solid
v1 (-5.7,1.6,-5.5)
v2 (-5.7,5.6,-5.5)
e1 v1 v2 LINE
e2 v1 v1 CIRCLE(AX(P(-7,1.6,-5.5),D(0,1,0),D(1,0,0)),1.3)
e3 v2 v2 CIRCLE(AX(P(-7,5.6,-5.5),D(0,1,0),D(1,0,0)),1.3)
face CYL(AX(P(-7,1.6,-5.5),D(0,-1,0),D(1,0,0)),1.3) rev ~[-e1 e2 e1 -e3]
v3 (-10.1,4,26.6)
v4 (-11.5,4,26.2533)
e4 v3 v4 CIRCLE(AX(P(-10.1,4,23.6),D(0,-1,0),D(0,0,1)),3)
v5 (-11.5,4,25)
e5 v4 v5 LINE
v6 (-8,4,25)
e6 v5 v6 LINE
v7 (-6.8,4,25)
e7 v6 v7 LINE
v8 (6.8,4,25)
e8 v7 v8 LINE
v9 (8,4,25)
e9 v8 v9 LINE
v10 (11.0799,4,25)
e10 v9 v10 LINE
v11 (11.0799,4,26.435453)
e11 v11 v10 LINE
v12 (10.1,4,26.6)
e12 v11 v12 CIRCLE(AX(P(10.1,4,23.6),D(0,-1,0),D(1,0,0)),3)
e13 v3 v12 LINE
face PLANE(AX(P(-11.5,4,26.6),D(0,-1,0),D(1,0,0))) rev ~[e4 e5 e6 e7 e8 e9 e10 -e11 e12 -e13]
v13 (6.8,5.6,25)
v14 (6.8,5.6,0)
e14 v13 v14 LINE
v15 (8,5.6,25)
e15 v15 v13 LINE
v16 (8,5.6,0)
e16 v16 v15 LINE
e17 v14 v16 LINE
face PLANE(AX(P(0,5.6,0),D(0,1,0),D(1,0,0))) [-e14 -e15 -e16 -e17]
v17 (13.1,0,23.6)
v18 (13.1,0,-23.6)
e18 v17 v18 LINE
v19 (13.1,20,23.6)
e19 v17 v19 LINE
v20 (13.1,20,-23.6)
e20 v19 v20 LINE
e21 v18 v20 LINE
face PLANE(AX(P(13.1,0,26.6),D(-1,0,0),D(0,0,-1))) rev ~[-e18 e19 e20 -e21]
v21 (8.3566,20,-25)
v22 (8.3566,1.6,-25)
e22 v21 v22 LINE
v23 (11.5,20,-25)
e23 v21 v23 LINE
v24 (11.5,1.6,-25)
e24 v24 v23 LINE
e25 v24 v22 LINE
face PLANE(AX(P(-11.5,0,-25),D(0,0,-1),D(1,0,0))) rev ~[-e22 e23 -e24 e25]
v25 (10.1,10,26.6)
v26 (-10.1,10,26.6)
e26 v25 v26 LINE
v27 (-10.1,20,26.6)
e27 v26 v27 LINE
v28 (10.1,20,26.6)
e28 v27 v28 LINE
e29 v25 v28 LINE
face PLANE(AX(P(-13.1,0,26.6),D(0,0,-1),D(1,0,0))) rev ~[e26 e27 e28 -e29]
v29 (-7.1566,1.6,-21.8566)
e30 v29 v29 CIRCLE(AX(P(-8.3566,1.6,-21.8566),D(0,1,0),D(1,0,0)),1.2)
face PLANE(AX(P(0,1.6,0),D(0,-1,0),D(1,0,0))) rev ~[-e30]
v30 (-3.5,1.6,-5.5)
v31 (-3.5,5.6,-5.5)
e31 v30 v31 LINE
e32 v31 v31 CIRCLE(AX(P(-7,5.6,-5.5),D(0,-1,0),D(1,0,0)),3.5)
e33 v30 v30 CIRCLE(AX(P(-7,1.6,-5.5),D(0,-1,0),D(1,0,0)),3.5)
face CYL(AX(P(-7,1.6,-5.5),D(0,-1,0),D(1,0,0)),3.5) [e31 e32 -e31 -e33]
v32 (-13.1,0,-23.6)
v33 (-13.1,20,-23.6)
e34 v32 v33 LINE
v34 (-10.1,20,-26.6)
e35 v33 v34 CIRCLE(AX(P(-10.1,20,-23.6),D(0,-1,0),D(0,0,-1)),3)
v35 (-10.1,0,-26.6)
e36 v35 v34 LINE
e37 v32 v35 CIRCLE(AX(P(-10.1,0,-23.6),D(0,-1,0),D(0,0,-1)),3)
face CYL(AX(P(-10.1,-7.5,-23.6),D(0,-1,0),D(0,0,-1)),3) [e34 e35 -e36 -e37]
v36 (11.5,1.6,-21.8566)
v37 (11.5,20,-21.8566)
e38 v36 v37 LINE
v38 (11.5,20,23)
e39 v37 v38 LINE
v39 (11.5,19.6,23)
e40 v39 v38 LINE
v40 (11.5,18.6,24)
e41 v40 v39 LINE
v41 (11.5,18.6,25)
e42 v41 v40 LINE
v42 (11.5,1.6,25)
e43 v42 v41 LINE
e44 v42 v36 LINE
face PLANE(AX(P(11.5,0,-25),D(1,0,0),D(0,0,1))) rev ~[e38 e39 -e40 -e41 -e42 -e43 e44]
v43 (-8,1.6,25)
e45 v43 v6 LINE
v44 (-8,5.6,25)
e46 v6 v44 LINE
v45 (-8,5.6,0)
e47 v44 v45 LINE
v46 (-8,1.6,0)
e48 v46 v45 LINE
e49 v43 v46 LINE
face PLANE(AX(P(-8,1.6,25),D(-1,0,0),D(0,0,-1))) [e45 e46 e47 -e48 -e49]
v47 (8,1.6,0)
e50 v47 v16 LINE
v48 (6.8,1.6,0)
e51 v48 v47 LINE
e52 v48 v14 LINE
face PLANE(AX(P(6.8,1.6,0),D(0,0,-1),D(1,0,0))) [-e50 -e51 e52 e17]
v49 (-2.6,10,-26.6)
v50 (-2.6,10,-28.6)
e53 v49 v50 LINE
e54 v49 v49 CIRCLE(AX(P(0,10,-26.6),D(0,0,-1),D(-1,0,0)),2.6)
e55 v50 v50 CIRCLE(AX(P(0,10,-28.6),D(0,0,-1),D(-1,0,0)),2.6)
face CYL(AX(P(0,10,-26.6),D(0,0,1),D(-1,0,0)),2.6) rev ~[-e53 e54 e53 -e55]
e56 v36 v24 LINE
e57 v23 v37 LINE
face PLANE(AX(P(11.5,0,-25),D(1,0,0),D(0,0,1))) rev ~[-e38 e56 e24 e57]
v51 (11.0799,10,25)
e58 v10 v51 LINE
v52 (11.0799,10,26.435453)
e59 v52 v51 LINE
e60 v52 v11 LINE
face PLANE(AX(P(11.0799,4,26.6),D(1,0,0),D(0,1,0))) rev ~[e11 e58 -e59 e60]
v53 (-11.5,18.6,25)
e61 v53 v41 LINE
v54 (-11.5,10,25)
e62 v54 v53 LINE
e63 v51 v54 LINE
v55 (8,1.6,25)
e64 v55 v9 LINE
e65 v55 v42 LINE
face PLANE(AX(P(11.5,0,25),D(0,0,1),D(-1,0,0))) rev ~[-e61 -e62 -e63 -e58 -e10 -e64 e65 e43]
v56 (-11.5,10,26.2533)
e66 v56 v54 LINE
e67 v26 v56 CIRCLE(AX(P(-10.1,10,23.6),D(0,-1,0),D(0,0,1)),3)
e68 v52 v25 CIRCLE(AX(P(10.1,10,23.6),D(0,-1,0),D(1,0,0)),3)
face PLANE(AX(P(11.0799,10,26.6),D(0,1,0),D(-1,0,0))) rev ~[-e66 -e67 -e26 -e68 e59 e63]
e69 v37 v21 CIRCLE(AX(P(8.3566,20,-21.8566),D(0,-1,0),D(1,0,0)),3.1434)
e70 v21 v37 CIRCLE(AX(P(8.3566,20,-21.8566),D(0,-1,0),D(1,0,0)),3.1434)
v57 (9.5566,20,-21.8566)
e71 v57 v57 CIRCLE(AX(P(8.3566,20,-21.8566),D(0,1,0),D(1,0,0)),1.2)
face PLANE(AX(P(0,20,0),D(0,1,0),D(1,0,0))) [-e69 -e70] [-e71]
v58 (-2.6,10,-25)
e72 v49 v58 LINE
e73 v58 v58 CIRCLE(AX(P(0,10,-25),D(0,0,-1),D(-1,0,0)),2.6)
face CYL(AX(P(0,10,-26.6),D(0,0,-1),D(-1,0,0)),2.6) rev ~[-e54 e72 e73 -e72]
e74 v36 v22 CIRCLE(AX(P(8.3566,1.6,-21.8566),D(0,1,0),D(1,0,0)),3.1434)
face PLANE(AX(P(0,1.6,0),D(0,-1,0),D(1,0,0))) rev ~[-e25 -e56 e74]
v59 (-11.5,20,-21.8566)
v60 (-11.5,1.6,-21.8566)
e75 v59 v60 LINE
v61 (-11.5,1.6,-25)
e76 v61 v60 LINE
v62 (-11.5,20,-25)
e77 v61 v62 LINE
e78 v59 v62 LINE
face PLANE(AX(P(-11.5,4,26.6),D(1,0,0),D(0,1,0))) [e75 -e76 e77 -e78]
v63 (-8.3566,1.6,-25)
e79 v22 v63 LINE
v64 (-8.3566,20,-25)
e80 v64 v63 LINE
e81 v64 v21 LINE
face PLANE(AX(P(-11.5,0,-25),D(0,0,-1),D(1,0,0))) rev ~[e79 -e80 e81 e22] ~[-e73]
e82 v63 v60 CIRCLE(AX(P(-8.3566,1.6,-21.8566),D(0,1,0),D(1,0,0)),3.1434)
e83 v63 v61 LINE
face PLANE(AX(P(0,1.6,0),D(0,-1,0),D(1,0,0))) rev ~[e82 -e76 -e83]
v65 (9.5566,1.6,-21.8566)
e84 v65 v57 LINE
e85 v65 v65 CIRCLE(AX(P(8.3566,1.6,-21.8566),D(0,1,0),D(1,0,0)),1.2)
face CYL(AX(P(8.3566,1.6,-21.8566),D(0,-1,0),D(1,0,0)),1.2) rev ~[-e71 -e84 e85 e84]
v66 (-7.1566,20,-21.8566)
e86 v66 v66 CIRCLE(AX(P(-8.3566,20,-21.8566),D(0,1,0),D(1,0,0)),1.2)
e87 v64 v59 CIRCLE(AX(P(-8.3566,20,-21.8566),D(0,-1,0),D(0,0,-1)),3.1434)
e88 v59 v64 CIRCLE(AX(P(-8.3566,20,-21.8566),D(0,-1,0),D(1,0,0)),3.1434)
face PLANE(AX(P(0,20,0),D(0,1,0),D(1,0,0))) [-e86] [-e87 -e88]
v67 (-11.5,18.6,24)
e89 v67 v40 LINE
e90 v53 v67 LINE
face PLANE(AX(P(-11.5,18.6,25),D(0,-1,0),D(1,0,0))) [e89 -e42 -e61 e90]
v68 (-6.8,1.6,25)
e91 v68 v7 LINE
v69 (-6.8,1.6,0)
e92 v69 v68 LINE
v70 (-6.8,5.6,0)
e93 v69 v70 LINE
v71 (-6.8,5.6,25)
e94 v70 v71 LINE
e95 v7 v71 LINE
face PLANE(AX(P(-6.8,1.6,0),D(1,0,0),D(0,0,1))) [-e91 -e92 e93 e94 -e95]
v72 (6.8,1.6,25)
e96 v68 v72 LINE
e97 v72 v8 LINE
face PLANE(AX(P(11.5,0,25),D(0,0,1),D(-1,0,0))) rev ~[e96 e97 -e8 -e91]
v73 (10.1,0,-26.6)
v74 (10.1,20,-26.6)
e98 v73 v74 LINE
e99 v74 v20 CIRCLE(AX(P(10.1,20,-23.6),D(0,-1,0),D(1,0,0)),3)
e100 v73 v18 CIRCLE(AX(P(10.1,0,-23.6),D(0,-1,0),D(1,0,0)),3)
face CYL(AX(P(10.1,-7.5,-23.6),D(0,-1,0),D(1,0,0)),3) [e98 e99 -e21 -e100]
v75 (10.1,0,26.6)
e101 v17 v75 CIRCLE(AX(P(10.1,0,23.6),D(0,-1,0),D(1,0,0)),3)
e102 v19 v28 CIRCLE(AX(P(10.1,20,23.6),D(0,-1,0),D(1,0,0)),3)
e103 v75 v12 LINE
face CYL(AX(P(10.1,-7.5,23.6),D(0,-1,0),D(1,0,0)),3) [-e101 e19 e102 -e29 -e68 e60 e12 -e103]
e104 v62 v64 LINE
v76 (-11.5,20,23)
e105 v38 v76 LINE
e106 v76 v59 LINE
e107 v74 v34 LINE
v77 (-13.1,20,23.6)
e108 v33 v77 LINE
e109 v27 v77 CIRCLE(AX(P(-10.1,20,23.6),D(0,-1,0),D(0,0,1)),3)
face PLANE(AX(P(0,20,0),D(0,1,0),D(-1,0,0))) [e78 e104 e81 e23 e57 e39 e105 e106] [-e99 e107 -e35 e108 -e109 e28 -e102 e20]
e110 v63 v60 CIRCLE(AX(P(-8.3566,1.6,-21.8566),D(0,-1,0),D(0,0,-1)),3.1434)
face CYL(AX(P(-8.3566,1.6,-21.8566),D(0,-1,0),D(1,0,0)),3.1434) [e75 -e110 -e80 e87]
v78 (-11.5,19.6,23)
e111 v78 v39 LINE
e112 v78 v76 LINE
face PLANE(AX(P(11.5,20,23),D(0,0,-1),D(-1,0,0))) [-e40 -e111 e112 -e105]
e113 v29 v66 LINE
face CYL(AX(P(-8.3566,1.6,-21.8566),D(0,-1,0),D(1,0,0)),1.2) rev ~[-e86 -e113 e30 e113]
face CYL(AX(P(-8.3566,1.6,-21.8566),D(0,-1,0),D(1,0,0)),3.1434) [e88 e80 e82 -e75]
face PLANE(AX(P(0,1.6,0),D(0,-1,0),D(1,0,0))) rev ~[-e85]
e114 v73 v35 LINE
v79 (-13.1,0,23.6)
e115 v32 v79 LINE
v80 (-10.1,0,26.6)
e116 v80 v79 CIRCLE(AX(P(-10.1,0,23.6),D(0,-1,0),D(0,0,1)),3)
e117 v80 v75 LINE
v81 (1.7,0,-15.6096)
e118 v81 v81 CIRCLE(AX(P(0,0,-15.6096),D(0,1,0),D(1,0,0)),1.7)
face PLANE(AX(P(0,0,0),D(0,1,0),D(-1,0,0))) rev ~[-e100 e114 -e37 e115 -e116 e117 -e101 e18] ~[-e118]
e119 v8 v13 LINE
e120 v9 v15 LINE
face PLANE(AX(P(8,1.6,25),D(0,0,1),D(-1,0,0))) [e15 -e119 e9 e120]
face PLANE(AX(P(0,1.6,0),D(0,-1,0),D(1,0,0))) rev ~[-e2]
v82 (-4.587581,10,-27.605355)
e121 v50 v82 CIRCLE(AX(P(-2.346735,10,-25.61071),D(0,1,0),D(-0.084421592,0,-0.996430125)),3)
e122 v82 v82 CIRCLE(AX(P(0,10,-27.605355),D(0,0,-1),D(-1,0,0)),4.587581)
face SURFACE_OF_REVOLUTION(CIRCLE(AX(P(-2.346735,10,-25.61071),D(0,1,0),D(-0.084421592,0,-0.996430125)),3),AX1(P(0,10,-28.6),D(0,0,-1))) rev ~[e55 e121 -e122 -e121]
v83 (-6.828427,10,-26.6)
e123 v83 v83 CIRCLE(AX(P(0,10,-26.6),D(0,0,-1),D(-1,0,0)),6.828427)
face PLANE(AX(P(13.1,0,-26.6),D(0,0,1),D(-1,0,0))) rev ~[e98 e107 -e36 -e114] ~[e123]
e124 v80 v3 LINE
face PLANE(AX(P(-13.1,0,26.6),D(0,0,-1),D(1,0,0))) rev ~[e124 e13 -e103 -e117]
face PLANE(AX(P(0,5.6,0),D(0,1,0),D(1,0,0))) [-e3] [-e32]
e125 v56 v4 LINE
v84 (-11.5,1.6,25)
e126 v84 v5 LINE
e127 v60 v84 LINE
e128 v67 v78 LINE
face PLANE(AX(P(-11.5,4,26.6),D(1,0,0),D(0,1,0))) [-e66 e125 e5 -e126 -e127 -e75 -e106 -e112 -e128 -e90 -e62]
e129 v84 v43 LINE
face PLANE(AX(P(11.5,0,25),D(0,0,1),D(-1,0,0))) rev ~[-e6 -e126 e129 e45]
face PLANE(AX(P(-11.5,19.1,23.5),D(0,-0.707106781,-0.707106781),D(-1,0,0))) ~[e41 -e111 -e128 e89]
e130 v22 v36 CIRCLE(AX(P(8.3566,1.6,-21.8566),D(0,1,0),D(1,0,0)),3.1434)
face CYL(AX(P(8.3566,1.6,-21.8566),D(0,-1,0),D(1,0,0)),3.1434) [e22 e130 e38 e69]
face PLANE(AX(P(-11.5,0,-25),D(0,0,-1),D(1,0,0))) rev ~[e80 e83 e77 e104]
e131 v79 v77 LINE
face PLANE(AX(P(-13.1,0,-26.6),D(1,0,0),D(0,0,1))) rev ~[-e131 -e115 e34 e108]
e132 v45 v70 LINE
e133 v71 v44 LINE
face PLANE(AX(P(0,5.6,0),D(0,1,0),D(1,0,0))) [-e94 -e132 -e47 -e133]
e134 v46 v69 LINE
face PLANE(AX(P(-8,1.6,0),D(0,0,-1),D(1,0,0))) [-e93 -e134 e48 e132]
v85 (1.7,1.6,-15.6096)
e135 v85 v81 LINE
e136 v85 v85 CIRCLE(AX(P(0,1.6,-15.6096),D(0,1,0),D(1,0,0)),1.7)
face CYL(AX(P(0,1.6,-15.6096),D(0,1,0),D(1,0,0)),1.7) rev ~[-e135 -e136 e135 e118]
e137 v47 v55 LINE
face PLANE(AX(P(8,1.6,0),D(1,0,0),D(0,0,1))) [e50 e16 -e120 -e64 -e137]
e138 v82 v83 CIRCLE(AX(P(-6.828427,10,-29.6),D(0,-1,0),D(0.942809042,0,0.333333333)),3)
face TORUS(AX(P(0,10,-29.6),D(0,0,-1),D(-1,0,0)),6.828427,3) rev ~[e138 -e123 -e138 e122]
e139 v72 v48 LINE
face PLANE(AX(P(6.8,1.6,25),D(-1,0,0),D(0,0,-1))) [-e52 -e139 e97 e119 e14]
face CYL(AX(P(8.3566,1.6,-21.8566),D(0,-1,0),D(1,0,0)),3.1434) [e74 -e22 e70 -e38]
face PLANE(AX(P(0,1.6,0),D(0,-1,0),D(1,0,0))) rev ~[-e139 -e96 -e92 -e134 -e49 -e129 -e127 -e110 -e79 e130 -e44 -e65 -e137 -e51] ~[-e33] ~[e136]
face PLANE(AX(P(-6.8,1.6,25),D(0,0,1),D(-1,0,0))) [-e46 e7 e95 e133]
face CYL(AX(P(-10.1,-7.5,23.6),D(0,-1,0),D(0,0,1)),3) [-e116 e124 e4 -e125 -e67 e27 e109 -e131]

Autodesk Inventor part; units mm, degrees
ref_plane "YZ Plane" through (0, 0, 0) normal (1, 0, 0) x (0, 1, 0)
ref_plane "XZ Plane" through (0, 0, 0) normal (0, 1, 0) x (-1, 0, 0)
ref_plane "XY Plane" through (0, 0, 0) normal (0, 0, 1) x (1, 0, 0)
sketch "Sketch1" plane through (0, 0, 0) normal (0, 1, 0) x (-1, 0, 0)
  line L0 (-11.5, 25) -> (11.5, 25)
  line L1 (11.5, 25) -> (11.5, -25)
  line L2 (11.5, -25) -> (-11.5, -25)
  line L3 (-11.5, -25) -> (-11.5, 25)
  line L4 (-11.5, 25) -> (11.5, -25) construction
  line L5 (11.5, 25) -> (-11.5, -25) construction
  line L6 (-13.1, -26.6) -> (13.1, -26.6)
  line L7 (13.1, -26.6) -> (13.1, 26.6)
  line L8 (13.1, 26.6) -> (-13.1, 26.6)
  line L9 (-13.1, 26.6) -> (-13.1, -26.6)
  line L10 (-13.1, -26.6) -> (13.1, 26.6) construction
  line L11 (13.1, -26.6) -> (-13.1, 26.6) construction
  point P0 (0, 0)
  dimension "d0" = 23
  dimension "d1" = 50
  dimension "d2" = 1.6
  dimension "d3" = 1.6
extrude "Extrusion1" add sketch "Sketch1" along normal blind 20
sketch "Sketch2" plane through (0, 0, 0) normal (0, -1, 0) x (1, 0, 0)
  line L0 (-11.5, -25) -> (-11.5, 25) projected
  line L1 (-11.5, 25) -> (11.5, 25) projected
  line L2 (11.5, 25) -> (11.5, -25) projected
  line L3 (11.5, -25) -> (-11.5, -25) projected
  point P0 (0, 0)
extrude "Extrusion2" add sketch "Sketch2" against normal blind 1.6
sketch "Sketch3" plane through (0, 1.6, 0) normal (0, 1, 0) x (1, 0, 0)
  line L0 (-11.5, 25) -> (11.5, 25) projected
  line L1 (-10.5, 9) -> (10.5, 9)
  line L2 (10.5, 9) -> (10.5, -23)
  line L3 (10.5, -23) -> (-10.5, -23)
  line L4 (-10.5, -23) -> (-10.5, 9)
  line L5 (-10.5, 9) -> (10.5, -23) construction
  line L6 (10.5, 9) -> (-10.5, -23) construction
  circle A0 centre (-7, 5.5) radius 1.3
  circle A1 centre (-7, 5.5) radius 3.5
  point P0 (0, 0)
  point P1 (0, -7)
  dimension "d8" = 21
  dimension "d9" = 32
  dimension "d10" = 16
  dimension "d11" = 2.6
  dimension "d26" = 3.5
  dimension "d27" = 3.5
  dimension "d29" = 7
extrude "Extrusion3" add sketch "Sketch3" along normal blind 4 contours A1
sketch "Sketch4" plane through (-13.1, 0, 26.6) normal (0, 0, 1) x (1, 0, 0)
  line L0 (0, 0) -> (26.2, 0) projected
  line L1 (1.6, 1.6) -> (1.6, 20) projected
  line L2 (1.6, 1.6) -> (1.6, 20) projected
  line L3 (24.6, 1.6) -> (24.6, 20) projected
  line L4 (24.6, 1.6) -> (24.6, 20) projected
  line L5 (1.6, 4) -> (24.1799, 4)
  line L6 (24.1799, 4) -> (24.1799, 10)
  line L7 (24.1799, 10) -> (1.6, 10)
  line L8 (1.6, 10) -> (1.6, 4)
  point P0 (13.1, 0)
  dimension "d16" = 6
  dimension "d17" = 4
extrude "Extrusion4" cut sketch "Sketch4" against normal blind 4
sketch "Sketch5" plane through (0, 1.6, 0) normal (0, 1, 0) x (1, 0, 0)
  line L0 (-11.5, -25) -> (-11.5, 25) projected
  line L1 (11.5, -25) -> (-11.5, -25) projected
  line L2 (11.5, 25) -> (11.5, -25) projected
  line L3 (6.8, 0) -> (8, 0)
  line L4 (8, 0) -> (8, -25)
  line L5 (8, -25) -> (6.8, -25)
  line L6 (6.8, -25) -> (6.8, 0)
  line L7 (-8, 0) -> (-6.8, 0)
  line L8 (-6.8, 0) -> (-6.8, -25)
  line L9 (-6.8, -25) -> (-8, -25)
  line L10 (-8, -25) -> (-8, 0)
  point P0 (0, 0)
  dimension "d20" = 1.2
  dimension "d21" = 1.2
  dimension "d22" = 3.5
  dimension "d23" = 3.5
extrude "Extrusion5" add sketch "Sketch5" along normal blind 4
fillet "Fillet1" radius 3 4 edges at (13.1, 10, 26.6) (13.1, 10, -26.6) (-13.1, 10, -26.6) (-13.1, 10, 26.6)
sketch "Sketch6" plane through (10.1, 0, -26.6) normal (0, 0, -1) x (-1, 0, 0)
  circle A0 centre (10.1, 10) radius 2.6
  point P0 (10.1, 0)
  dimension "d31" = 5.2
extrude "Extrusion6" cut sketch "Sketch6" against normal blind 4
sketch "Sketch7" plane through (10.1, 0, -26.6) normal (0, 0, -1) x (-1, 0, 0)
  circle A0 centre (10.1, 10) radius 2.6 projected
  circle A1 centre (10.1, 10) radius 4
  point P0 (10.1, 0)
  dimension "d34" = 8
extrude "Extrusion7" add sketch "Sketch7" along normal blind 2
fillet "Fillet2" radius 3 2 edges at (4, 10, -26.6) (4, 10, -28.6)
sketch "Sketch8" plane through (-11.5, 20, 25) normal (1, 0, 0) x (0, 0, -1)
  line L0 (-1.2533, -16) -> (-1.2533, -10) projected
  line L1 (-1.2533, -16) -> (0, -16) projected
  line L2 (0, -18.4) -> (0, -16) projected
  line L3 (0, -18.4) -> (50, -18.4) projected
  line L4 (50, -18.4) -> (50, 0) projected
  line L5 (0, 0) -> (50, 0) projected
  line L6 (0, -10) -> (0, 0) projected
  line L7 (-1.2533, -10) -> (0, -10) projected
  line L8 (27, -18.4) -> (34, -18.4) projected
  line L9 (29.2, -14.4) -> (31.8, -14.4) projected
  line L10 (34, -14.4) -> (27, -14.4) projected
  point P0 (25, -20)
  dimension "d38" = 14.4
sketch "Sketch9" plane through (11.5, 20, 25) normal (0, 0, -1) x (-1, 0, 0)
  line L0 (23, -10) -> (23, 0) projected
  line L1 (0, 0) -> (23, 0)
  line L2 (23, 0) -> (23, -1.4)
  line L3 (23, -1.4) -> (0, -1.4)
  line L4 (0, -1.4) -> (0, 0)
  point P0 (11.5, -20)
  dimension "d39" = 1.4
extrude "Extrusion8" add sketch "Sketch9" along normal blind 2
sketch "Sketch10" plane through (0, 1.6, 0) normal (0, 1, 0) x (1, 0, 0)
  line L0 (11.5, 25) -> (11.5, -25) projected
  line L1 (-11.5, 25) -> (11.5, 25) projected
  line L2 (-11.5, -25) -> (-11.5, 25) projected
  circle A0 centre (-8.3566, 21.8566) radius 1.2
  circle A1 centre (-8.3566, 21.8566) radius 3.1434
  circle A2 centre (8.3566, 21.8566) radius 1.2
  circle A3 centre (8.3566, 21.8566) radius 3.1434
  point P0 (0, 0)
  dimension "d45" = 2.4
  dimension "d46" = 3.1434
  dimension "d47" = 3.1434
  dimension "d48" = 2.4
  dimension "d49" = 3.1434
  dimension "d50" = 3.1434
extrude "Extrusion9" add sketch "Sketch10" along normal up to surface (18.4 mm away) contours A3 | A1
chamfer "Chamfer2" distance 1 angle 45 1 edges at (0, 18.6, 23)
sketch "Sketch11" plane through (0, 1.6, 0) normal (0, 1, 0) x (1, 0, 0)
  circle A0 centre (0, 15.6096) radius 1.7
  point P0 (0, 0)
  dimension "d56" = 3.4
extrude "Extrusion10" cut sketch "Sketch11" against normal through all
equation "\"d3\" = d2"
equation "\"d47\" = d46"
equation "\"d49\" = d47"
equation "\"d50\" = d46"
properties part number "bottom v3"
